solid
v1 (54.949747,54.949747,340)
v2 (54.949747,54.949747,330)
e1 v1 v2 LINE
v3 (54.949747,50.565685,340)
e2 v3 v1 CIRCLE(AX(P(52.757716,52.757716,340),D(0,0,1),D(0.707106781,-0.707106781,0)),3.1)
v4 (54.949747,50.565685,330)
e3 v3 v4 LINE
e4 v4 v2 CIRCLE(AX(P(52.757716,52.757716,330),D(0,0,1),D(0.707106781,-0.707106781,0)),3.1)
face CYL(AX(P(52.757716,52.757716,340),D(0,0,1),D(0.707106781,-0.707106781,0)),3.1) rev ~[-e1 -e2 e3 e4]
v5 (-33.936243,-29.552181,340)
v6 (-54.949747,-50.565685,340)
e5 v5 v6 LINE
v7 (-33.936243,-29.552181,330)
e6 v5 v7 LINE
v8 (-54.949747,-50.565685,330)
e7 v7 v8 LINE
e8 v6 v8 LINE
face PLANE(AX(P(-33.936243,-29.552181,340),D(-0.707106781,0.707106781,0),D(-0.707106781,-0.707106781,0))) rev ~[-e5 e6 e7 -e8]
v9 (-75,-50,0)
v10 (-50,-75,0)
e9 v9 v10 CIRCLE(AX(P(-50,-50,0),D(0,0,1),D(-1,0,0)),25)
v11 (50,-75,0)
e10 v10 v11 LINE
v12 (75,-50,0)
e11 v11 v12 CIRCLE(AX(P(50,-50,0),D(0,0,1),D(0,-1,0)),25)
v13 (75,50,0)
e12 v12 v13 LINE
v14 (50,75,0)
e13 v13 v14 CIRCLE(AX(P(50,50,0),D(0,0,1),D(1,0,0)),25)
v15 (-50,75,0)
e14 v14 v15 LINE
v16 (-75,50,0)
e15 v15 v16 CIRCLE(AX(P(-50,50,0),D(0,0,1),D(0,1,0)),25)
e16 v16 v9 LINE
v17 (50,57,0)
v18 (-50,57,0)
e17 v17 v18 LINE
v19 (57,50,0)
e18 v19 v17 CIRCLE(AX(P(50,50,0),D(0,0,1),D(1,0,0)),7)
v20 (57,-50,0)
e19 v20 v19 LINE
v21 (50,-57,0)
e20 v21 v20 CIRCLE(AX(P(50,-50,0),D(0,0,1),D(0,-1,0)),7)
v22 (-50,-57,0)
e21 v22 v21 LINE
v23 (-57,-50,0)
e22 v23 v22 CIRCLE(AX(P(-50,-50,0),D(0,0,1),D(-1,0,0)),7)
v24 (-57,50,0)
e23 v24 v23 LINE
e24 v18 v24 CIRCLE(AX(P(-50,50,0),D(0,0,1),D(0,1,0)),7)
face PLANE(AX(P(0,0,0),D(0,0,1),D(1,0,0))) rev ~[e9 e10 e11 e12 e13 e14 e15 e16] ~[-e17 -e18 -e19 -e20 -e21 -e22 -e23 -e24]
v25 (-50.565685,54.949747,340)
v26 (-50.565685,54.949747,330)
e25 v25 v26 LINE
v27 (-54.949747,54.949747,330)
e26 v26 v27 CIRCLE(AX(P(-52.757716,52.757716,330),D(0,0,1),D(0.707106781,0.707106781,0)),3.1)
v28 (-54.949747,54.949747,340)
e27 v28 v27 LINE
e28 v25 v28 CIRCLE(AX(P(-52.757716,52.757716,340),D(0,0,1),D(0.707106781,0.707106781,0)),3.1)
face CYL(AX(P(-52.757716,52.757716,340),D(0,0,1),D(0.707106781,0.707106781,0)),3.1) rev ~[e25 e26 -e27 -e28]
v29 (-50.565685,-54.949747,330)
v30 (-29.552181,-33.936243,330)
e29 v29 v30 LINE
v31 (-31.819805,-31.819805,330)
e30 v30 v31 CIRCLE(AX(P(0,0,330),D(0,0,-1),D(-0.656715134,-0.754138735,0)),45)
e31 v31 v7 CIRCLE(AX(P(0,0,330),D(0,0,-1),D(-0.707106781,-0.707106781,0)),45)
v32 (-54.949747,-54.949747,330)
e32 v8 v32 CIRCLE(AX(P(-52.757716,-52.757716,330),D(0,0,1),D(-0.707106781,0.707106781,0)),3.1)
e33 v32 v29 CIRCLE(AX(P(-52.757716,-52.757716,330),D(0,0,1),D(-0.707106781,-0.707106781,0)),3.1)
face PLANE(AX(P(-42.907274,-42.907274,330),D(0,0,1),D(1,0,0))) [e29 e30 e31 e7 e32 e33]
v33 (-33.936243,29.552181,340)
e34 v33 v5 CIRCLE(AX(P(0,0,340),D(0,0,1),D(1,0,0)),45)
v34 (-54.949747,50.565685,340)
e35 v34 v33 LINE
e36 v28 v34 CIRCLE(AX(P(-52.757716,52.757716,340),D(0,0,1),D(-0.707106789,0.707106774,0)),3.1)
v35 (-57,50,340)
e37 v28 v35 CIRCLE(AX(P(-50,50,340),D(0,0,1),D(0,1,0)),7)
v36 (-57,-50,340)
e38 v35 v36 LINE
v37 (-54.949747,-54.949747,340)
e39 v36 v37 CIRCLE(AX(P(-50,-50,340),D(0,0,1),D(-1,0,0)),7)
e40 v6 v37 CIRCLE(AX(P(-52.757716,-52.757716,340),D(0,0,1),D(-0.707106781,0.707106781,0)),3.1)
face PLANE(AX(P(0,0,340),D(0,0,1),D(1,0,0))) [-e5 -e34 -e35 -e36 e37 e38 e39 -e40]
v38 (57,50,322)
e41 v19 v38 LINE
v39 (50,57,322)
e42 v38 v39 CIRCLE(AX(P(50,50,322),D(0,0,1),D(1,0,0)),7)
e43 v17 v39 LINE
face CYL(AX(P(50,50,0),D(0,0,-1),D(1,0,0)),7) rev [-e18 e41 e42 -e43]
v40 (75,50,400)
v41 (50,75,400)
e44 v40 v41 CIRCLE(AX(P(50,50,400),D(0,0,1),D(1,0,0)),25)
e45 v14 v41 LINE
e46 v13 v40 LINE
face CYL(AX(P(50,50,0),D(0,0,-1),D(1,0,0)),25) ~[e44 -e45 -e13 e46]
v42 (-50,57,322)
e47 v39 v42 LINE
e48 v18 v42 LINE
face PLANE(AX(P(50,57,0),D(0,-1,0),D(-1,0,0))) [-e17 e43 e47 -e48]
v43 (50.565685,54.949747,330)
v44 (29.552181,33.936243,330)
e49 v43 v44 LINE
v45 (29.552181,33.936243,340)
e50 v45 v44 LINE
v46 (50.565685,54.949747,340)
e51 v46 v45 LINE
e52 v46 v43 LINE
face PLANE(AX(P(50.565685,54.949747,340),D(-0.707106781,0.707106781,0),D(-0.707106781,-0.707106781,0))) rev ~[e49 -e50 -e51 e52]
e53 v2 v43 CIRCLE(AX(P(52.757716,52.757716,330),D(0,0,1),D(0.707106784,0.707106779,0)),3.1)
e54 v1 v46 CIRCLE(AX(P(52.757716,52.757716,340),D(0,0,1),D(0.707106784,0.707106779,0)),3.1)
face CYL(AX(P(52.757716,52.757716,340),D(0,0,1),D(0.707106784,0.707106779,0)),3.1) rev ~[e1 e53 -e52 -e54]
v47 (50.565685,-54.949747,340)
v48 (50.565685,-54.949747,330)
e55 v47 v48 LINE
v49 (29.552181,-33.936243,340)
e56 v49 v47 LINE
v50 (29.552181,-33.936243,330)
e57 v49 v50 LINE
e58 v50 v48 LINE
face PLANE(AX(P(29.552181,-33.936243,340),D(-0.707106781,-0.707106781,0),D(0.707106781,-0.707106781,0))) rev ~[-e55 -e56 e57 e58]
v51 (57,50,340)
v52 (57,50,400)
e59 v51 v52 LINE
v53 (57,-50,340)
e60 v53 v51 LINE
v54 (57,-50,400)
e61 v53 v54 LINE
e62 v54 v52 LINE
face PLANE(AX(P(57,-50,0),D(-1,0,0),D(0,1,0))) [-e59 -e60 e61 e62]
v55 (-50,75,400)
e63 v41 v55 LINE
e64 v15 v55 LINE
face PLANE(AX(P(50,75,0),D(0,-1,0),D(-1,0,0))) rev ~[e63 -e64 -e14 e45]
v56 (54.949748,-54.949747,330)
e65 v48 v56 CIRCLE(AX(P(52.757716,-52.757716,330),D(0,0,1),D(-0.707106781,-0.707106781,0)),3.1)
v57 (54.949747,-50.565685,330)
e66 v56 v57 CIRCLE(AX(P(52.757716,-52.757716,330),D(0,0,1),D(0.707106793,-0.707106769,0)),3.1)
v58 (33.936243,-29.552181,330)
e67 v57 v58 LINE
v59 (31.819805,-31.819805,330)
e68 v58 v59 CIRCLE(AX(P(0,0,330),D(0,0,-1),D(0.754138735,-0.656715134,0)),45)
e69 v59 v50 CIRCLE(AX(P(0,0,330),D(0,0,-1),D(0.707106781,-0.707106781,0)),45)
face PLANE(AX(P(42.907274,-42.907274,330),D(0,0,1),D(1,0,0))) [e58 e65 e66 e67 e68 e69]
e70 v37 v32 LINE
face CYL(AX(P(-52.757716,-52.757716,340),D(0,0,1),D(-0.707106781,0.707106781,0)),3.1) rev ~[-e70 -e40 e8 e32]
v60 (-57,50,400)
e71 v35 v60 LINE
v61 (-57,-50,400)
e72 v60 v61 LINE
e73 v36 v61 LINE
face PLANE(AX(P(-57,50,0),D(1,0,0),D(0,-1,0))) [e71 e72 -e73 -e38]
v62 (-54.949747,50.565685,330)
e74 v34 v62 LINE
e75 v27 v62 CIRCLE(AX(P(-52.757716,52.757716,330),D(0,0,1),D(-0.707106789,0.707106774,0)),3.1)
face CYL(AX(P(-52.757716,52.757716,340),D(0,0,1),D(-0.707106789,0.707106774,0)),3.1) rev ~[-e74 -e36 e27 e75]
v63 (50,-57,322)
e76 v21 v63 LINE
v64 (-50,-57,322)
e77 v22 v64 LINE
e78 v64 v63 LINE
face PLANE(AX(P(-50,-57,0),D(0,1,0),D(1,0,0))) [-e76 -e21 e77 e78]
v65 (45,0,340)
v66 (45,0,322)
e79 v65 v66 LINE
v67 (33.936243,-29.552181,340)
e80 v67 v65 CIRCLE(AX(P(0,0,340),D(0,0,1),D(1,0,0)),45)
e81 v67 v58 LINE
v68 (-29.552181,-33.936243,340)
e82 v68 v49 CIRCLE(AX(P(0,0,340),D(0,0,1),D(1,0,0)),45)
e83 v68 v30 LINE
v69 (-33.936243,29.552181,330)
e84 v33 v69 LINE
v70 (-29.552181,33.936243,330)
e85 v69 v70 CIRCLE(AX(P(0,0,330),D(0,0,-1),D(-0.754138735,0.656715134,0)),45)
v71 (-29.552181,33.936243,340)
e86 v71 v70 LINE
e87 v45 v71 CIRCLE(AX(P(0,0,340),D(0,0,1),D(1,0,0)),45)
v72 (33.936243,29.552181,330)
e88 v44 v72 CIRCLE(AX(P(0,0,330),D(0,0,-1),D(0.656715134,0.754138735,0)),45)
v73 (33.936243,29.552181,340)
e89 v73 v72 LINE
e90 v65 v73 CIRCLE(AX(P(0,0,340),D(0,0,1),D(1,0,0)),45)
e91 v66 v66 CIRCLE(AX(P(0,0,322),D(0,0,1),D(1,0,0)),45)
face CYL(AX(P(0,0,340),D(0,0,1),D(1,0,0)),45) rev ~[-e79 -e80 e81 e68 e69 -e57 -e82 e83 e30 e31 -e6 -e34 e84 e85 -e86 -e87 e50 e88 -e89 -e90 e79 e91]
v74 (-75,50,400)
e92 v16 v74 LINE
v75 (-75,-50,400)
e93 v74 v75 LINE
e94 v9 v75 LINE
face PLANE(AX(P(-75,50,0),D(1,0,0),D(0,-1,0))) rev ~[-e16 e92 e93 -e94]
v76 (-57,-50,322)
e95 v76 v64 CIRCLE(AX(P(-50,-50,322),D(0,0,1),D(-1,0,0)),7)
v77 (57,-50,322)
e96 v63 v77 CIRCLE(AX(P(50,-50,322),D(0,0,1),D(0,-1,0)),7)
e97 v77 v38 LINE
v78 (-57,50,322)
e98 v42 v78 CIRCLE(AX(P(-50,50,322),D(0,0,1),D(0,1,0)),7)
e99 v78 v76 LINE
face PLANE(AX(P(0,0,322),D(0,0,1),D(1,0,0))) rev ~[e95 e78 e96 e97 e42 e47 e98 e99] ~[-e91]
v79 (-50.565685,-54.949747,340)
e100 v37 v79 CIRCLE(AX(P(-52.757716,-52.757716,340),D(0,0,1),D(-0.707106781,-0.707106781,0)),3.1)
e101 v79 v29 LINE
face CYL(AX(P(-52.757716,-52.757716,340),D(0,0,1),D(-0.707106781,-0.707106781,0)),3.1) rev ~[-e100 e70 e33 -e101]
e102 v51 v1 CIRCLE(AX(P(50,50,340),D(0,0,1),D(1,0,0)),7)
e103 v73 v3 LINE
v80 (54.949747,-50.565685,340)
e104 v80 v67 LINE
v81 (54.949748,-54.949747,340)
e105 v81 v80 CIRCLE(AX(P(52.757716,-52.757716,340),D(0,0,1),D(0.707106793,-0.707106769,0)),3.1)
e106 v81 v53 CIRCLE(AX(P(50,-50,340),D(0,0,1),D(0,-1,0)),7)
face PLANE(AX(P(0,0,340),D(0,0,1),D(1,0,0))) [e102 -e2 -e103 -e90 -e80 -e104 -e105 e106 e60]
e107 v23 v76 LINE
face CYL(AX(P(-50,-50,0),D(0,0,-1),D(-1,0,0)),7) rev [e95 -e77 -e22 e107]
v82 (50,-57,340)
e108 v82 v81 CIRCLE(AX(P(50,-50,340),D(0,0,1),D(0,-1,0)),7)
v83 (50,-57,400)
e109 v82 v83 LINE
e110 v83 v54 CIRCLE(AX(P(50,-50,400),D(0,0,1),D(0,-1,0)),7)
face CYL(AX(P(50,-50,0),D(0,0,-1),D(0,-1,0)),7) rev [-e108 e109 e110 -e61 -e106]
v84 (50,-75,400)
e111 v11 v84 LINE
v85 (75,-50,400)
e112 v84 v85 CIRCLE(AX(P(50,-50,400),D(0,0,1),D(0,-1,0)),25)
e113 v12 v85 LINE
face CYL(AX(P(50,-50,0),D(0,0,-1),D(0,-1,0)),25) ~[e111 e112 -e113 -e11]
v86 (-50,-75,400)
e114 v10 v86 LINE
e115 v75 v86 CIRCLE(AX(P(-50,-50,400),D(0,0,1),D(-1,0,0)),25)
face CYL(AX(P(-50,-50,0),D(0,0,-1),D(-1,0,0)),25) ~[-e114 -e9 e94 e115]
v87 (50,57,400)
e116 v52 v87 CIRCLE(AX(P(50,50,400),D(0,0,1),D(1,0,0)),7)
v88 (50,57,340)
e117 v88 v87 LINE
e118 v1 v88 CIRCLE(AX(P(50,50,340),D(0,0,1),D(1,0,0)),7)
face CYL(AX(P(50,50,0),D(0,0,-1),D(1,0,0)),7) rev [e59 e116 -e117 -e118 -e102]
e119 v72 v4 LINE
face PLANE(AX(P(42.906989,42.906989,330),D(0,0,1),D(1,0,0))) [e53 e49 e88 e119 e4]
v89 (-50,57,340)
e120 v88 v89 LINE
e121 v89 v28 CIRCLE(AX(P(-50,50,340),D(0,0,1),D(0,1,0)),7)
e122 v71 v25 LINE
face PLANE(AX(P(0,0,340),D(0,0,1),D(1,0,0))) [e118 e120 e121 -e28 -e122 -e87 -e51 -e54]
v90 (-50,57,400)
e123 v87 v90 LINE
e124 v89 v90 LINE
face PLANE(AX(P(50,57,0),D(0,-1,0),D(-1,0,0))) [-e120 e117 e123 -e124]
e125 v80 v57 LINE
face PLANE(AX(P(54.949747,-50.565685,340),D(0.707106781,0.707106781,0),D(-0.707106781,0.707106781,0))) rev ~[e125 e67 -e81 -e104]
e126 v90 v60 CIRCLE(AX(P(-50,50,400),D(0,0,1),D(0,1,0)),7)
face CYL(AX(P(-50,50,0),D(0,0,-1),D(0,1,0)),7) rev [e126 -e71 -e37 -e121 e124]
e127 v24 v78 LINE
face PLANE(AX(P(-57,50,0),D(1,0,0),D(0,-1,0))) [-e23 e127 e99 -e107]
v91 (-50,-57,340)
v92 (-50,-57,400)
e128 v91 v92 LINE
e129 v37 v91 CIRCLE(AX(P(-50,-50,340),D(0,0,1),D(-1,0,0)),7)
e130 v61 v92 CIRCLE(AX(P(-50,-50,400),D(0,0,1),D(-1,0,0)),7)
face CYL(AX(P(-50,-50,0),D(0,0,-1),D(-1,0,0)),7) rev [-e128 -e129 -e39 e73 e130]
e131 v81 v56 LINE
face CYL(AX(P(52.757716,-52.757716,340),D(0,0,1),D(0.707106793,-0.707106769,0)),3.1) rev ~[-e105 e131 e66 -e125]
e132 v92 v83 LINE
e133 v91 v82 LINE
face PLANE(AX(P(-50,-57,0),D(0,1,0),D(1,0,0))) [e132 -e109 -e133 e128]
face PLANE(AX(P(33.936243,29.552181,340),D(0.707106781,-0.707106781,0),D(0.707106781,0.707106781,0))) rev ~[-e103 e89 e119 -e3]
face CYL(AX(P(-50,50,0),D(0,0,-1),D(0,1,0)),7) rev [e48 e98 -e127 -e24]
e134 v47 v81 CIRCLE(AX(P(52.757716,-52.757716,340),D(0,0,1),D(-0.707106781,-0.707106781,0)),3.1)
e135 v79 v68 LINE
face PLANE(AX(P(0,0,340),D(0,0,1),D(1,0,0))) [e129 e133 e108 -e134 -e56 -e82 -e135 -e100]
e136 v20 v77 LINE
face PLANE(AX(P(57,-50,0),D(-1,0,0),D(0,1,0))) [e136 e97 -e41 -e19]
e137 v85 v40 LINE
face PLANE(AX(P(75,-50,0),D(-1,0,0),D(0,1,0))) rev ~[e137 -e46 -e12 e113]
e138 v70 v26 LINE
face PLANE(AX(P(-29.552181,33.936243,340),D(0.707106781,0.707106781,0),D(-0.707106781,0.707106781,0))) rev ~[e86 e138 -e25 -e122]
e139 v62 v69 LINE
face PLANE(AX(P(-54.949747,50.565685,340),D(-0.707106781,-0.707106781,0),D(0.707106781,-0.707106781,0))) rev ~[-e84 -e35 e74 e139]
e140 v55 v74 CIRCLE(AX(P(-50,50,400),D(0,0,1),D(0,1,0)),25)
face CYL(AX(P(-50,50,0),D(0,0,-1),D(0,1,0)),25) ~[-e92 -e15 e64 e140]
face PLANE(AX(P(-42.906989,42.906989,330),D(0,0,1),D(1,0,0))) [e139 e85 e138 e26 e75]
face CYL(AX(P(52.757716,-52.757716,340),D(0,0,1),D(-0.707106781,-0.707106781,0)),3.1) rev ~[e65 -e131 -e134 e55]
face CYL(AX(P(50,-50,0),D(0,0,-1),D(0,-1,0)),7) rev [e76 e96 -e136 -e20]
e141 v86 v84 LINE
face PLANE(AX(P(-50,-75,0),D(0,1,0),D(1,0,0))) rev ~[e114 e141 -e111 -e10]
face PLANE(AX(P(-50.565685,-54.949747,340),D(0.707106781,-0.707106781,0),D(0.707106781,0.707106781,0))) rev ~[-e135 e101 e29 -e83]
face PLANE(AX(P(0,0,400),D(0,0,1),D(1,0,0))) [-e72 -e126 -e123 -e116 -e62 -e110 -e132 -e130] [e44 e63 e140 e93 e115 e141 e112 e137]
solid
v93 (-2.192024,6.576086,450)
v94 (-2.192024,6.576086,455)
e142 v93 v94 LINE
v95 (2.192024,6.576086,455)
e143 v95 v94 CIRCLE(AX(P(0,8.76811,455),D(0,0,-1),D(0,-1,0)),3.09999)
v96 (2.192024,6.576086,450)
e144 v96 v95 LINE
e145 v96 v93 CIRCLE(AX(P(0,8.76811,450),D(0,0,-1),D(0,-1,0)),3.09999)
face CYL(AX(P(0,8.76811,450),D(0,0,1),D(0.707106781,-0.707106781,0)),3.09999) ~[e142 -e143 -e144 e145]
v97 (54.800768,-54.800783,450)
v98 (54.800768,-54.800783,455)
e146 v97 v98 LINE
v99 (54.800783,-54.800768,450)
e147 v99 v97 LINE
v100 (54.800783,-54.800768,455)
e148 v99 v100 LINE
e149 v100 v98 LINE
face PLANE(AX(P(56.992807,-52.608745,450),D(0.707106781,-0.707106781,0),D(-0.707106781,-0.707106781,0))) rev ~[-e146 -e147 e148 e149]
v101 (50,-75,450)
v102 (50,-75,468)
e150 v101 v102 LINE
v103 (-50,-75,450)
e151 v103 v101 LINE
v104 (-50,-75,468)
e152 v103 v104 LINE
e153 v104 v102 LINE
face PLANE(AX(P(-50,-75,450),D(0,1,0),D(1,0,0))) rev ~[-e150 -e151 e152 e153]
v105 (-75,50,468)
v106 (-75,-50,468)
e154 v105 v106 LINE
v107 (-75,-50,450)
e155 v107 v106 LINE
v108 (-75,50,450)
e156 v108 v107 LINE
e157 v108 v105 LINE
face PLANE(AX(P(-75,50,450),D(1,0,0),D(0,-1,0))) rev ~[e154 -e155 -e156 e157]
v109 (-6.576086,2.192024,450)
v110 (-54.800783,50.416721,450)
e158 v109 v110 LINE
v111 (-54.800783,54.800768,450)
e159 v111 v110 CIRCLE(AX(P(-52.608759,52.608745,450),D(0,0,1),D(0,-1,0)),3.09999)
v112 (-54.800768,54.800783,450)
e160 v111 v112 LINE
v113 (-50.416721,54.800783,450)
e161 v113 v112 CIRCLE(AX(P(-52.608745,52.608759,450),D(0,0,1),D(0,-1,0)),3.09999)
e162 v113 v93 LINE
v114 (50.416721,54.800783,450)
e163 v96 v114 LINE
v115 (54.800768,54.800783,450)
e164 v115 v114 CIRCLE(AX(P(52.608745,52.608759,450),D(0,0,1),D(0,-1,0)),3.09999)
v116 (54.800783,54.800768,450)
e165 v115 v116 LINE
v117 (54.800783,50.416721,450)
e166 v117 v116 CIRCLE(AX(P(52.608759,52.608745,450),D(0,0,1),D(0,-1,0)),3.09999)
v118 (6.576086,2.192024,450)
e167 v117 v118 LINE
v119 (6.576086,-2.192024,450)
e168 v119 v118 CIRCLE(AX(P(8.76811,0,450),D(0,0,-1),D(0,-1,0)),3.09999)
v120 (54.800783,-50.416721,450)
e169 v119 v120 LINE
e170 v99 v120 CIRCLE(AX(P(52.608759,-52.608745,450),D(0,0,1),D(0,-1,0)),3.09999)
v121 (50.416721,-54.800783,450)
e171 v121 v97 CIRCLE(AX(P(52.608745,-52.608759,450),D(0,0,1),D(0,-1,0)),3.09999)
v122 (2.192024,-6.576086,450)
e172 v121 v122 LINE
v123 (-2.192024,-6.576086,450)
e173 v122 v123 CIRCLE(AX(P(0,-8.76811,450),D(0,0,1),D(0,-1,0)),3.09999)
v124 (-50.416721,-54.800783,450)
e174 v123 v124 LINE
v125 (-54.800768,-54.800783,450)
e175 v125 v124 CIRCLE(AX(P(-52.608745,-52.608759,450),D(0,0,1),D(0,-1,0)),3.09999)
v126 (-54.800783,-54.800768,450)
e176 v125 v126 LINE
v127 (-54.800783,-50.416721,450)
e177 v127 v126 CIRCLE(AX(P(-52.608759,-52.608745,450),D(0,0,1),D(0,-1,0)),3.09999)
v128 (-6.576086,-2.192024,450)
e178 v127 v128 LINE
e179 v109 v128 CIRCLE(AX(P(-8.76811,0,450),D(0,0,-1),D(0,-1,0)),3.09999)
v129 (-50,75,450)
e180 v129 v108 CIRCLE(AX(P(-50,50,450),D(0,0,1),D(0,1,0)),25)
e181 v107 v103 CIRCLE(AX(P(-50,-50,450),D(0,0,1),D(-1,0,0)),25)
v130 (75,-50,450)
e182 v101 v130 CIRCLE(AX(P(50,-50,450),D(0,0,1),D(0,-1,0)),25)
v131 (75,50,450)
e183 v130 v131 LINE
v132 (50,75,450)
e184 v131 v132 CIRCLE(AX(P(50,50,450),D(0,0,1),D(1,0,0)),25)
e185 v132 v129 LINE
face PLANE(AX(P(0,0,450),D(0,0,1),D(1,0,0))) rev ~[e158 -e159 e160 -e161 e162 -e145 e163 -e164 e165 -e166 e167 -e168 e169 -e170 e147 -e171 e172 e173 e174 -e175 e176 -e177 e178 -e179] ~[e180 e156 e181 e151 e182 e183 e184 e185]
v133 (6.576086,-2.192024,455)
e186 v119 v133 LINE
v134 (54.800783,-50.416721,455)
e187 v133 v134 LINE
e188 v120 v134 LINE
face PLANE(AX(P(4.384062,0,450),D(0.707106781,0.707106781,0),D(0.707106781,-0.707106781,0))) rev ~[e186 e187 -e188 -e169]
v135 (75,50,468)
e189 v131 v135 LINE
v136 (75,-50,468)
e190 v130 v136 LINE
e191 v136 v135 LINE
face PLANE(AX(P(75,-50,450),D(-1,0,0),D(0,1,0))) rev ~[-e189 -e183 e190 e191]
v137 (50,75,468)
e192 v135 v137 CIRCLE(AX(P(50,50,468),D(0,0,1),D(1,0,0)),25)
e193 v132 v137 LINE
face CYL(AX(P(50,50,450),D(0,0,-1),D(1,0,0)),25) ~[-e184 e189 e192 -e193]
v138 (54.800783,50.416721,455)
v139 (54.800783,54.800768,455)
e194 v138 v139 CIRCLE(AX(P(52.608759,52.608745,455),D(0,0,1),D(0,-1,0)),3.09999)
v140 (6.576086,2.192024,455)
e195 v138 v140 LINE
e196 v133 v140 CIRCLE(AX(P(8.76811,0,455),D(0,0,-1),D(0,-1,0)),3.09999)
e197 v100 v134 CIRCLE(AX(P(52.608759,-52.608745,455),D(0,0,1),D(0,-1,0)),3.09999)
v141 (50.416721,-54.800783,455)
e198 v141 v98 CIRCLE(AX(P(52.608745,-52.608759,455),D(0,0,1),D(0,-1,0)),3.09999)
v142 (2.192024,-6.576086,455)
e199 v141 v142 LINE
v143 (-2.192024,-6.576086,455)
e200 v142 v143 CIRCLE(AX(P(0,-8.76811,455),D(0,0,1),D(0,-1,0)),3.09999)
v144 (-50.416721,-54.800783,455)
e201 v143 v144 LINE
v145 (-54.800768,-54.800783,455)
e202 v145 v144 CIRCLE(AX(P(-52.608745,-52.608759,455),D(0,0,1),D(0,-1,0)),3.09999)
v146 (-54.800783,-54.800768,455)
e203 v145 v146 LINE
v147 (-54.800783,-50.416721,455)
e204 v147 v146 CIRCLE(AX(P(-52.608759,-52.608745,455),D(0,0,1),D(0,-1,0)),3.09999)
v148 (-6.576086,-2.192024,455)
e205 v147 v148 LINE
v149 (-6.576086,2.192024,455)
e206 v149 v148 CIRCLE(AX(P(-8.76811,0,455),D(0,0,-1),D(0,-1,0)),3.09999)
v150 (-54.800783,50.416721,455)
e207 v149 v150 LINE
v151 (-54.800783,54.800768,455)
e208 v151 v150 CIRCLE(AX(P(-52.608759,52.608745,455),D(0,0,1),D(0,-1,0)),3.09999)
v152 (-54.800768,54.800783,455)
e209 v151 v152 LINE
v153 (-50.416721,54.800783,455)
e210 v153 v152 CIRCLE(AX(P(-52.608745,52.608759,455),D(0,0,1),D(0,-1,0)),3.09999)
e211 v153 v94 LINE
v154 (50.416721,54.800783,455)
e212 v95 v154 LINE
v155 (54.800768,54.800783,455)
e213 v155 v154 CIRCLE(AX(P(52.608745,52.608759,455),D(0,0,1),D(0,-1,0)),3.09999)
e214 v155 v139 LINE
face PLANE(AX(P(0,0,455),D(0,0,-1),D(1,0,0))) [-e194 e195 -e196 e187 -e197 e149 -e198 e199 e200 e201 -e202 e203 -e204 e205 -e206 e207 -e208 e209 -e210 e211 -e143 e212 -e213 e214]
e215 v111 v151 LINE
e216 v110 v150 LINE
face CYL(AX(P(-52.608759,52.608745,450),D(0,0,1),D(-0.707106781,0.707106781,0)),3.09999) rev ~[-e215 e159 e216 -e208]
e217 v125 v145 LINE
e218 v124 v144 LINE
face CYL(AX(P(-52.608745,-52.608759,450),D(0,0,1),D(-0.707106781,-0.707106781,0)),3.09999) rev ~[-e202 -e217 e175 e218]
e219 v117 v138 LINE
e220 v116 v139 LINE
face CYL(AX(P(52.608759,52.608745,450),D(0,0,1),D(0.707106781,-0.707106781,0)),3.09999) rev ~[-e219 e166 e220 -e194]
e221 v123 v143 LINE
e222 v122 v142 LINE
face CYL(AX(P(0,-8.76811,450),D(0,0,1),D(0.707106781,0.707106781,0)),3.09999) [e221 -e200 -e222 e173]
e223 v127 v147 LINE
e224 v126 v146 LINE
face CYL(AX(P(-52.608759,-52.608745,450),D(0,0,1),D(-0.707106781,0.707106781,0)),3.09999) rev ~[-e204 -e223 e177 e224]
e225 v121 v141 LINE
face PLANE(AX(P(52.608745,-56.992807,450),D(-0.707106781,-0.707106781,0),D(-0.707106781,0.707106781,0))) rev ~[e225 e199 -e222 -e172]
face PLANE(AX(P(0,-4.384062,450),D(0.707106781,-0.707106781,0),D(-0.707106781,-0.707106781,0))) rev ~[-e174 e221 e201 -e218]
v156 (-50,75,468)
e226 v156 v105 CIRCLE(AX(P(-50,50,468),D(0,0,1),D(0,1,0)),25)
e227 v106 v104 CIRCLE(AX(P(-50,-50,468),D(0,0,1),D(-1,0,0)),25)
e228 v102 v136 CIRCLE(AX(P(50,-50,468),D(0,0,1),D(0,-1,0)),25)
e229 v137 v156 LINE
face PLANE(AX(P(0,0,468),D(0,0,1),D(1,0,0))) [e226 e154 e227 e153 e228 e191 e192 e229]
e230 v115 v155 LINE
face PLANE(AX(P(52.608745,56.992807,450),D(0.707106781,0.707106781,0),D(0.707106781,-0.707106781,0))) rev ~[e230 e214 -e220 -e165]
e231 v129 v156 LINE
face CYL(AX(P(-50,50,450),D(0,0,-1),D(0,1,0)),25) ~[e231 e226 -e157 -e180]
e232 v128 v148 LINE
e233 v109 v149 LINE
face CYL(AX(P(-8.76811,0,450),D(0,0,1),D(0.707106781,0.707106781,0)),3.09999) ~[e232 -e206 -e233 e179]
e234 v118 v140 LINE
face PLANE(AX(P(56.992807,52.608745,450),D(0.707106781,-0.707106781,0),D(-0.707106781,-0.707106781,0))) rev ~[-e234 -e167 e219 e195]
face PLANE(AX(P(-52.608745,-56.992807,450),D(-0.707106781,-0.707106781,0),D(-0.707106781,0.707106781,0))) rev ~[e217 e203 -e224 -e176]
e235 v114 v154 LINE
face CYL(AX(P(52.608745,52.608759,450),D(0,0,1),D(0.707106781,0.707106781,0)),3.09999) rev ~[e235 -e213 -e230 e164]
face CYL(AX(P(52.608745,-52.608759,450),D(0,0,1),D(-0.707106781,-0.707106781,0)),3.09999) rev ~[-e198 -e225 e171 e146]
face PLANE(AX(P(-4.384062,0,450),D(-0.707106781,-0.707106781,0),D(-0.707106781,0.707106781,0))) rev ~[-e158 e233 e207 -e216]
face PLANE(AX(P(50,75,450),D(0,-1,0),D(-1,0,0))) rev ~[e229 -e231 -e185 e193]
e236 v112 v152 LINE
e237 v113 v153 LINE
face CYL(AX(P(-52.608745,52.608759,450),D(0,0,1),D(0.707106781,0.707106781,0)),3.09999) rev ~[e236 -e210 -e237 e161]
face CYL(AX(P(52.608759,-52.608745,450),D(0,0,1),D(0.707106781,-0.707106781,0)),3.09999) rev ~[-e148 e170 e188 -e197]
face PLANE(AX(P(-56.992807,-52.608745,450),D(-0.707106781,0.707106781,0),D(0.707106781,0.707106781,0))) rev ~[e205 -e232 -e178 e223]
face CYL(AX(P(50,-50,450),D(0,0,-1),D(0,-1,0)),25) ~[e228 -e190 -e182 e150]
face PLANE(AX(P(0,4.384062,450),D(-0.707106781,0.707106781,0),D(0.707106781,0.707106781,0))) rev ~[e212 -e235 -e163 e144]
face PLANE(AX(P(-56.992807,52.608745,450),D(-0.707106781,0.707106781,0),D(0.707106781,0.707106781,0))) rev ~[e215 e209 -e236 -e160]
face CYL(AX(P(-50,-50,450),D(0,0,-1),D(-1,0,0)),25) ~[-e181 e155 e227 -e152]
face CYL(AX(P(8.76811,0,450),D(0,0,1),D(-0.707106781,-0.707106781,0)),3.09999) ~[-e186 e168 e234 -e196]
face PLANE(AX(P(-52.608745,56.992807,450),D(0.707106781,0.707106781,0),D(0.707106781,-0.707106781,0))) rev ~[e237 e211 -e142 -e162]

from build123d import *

# Parameters (mm, degrees)
F1_DEPTH  = 400
F2_T      = -18
F5_DEPTH  = 18
F7_R      = 45
F8_DEPTH  = 18
F10_DEPTH = 10
F12_DEPTH = 5
F13_R     = 3.09999


# Not quite as in the source:
# - a fillet or chamfer is up to 0.001 mm smaller than in the source, because OpenCascade refuses the exact size


with BuildPart() as f1:
    # F0 (on Top) → F1 (new body)
    with BuildSketch(Plane.XY):
        with BuildLine():
            ThreePointArc((-75, -50), (-67.6776695297, -67.6776695297), (-50, -75))
            Line((-50, -75), (50, -75))
            ThreePointArc((50, -75), (67.6776695297, -67.6776695297), (75, -50))
            Line((75, -50), (75, 50))
            ThreePointArc((75, 50), (67.6776695297, 67.6776695297), (50, 75))
            Line((50, 75), (-50, 75))
            ThreePointArc((-50, 75), (-67.6776695297, 67.6776695297), (-75, 50))
            Line((-75, 50), (-75, -50))
        make_face()
    extrude(amount=F1_DEPTH)

    # F2
    f2_openings = [f1.faces().sort_by_distance(p)[0] for p in [
        (0, 0, 400),
        (0, 0, 0),
    ]]
    offset(amount=F2_T, openings=f2_openings)

    # F7 (on offset) → F8 (join)
    with BuildSketch(Plane.XY.offset(340)):
        with BuildLine():
            Line((-57, 50), (-57, -50))
            ThreePointArc((-57, -50), (-54.9497474683, -54.9497474683), (-50, -57))
            Line((-50, -57), (50, -57))
            ThreePointArc((50, -57), (54.9497474683, -54.9497474683), (57, -50))
            Line((57, -50), (57, 50))
            ThreePointArc((57, 50), (54.9497474683, 54.9497474683), (50, 57))
            Line((50, 57), (-50, 57))
            ThreePointArc((-50, 57), (-54.9497474683, 54.9497474683), (-57, 50))
        make_face()
        Circle(F7_R, mode=Mode.SUBTRACT)
    extrude(amount=-F8_DEPTH)

    # F9 (on face) → F10 (cut)
    with BuildSketch(Plane.XY.offset(340)):
        with BuildLine():
            Line((54.9497474683, -50.5656854249), (33.9362430925, -29.5521810492))
            ThreePointArc((33.9362430925, -29.5521810492), (32.8975682992, -30.7042342357), (31.8198051534, -31.8198051534))
            ThreePointArc((31.8198051534, -31.8198051534), (30.7042342357, -32.8975682992), (29.5521810492, -33.9362430925))
            Line((29.5521810492, -33.9362430925), (50.5656854249, -54.9497474683))
            ThreePointArc((50.5656854249, -54.9497474683), (52.7577164727, -55.8577164466), (54.9497475052, -54.9497474314))
            ThreePointArc((54.9497475052, -54.9497474314), (55.8577164466, -52.7577164205), (54.9497474683, -50.5656854249))
        make_face()
        with BuildLine():
            ThreePointArc((-31.8198051534, -31.8198051534), (-32.8975682992, -30.7042342357), (-33.9362430925, -29.5521810492))
            Line((-33.9362430925, -29.5521810492), (-54.9497474683, -50.5656854249))
            ThreePointArc((-54.9497474683, -50.5656854249), (-55.8577164466, -52.7577164466), (-54.9497474683, -54.9497474683))
            ThreePointArc((-54.9497474683, -54.9497474683), (-52.7577164466, -55.8577164466), (-50.5656854249, -54.9497474683))
            Line((-50.5656854249, -54.9497474683), (-29.5521810492, -33.9362430925))
            ThreePointArc((-29.5521810492, -33.9362430925), (-30.7042342357, -32.8975682992), (-31.8198051534, -31.8198051534))
        make_face()
        with BuildLine():
            ThreePointArc((-33.9362430925, 29.5521810492), (-31.8198051534, 31.8198051534), (-29.5521810492, 33.9362430925))
            Line((-29.5521810492, 33.9362430925), (-50.5656854249, 54.9497474683))
            ThreePointArc((-50.5656854249, 54.9497474683), (-52.7577164628, 55.8577164466), (-54.9497474911, 54.9497474455))
            ThreePointArc((-54.9497474911, 54.9497474455), (-55.8577164466, 52.7577164305), (-54.9497474683, 50.5656854249))
            Line((-54.9497474683, 50.5656854249), (-33.9362430925, 29.5521810492))
        make_face()
        with BuildLine():
            ThreePointArc((29.5521810492, 33.9362430925), (31.8198051534, 31.8198051534), (33.9362430925, 29.5521810492))
            Line((33.9362430925, 29.5521810492), (54.9497474683, 50.5656854249))
            ThreePointArc((54.9497474683, 50.5656854249), (55.8577164466, 52.757716441), (54.9497474762, 54.9497474604))
            ThreePointArc((54.9497474762, 54.9497474604), (52.7577164522, 55.8577164466), (50.5656854249, 54.9497474683))
            Line((50.5656854249, 54.9497474683), (29.5521810492, 33.9362430925))
        make_face()
    extrude(amount=-F10_DEPTH, mode=Mode.SUBTRACT)


with BuildPart() as f5:
    # F4 (on offset) → F5 (new body)
    with BuildSketch(Plane.XY.offset(450)):
        with BuildLine():
            Line((-75, 50), (-75, -50))
            ThreePointArc((-75, -50), (-67.6776695297, -67.6776695297), (-50, -75))
            Line((-50, -75), (50, -75))
            ThreePointArc((50, -75), (67.6776695297, -67.6776695297), (75, -50))
            Line((75, -50), (75, 50))
            ThreePointArc((75, 50), (67.6776695297, 67.6776695297), (50, 75))
            Line((50, 75), (-50, 75))
            ThreePointArc((-50, 75), (-67.6776695297, 67.6776695297), (-75, 50))
        make_face()
    extrude(amount=F5_DEPTH)

    # F11 (on face) → F12 (cut)
    with BuildSketch(Plane(origin=(0, 0, 450), x_dir=(1, 0, 0), z_dir=(0, 0, -1))):
        Polygon((0, 4.3840620434), (-52.6087445203, 56.9928065636), (-56.9928065636, 52.6087445203), (-4.3840620434, 0), (-56.9928065636, -52.6087445203), (-52.6087445203, -56.9928065636), (0, -4.3840620434), (52.6087445203, -56.9928065636), (56.9928065636, -52.6087445203), (4.3840620434, 0), (56.9928065636, 52.6087445203), (52.6087445203, 56.9928065636), align=None)
    extrude(amount=-F12_DEPTH, mode=Mode.SUBTRACT)

    # F13 (radius 3.1 in the source; OpenCascade refuses exactly that, so slightly less here)
    f13_edges = [f5.edges().sort_by_distance(p)[0] for p in [
        (-52.608745, -56.992807, 452.5),
        (-56.992807, -52.608745, 452.5),
        (-56.992807, 52.608745, 452.5),
        (-52.608745, 56.992807, 452.5),
        (52.608745, 56.992807, 452.5),
        (56.992807, 52.608745, 452.5),
        (56.992807, -52.608745, 452.5),
        (52.608745, -56.992807, 452.5),
        (0, -4.384062, 452.5),
        (4.384062, 0, 452.5),
        (0, 4.384062, 452.5),
        (-4.384062, 0, 452.5),
    ]]
    fillet(f13_edges, radius=F13_R)


solid = Compound([f1.part, f5.part])
